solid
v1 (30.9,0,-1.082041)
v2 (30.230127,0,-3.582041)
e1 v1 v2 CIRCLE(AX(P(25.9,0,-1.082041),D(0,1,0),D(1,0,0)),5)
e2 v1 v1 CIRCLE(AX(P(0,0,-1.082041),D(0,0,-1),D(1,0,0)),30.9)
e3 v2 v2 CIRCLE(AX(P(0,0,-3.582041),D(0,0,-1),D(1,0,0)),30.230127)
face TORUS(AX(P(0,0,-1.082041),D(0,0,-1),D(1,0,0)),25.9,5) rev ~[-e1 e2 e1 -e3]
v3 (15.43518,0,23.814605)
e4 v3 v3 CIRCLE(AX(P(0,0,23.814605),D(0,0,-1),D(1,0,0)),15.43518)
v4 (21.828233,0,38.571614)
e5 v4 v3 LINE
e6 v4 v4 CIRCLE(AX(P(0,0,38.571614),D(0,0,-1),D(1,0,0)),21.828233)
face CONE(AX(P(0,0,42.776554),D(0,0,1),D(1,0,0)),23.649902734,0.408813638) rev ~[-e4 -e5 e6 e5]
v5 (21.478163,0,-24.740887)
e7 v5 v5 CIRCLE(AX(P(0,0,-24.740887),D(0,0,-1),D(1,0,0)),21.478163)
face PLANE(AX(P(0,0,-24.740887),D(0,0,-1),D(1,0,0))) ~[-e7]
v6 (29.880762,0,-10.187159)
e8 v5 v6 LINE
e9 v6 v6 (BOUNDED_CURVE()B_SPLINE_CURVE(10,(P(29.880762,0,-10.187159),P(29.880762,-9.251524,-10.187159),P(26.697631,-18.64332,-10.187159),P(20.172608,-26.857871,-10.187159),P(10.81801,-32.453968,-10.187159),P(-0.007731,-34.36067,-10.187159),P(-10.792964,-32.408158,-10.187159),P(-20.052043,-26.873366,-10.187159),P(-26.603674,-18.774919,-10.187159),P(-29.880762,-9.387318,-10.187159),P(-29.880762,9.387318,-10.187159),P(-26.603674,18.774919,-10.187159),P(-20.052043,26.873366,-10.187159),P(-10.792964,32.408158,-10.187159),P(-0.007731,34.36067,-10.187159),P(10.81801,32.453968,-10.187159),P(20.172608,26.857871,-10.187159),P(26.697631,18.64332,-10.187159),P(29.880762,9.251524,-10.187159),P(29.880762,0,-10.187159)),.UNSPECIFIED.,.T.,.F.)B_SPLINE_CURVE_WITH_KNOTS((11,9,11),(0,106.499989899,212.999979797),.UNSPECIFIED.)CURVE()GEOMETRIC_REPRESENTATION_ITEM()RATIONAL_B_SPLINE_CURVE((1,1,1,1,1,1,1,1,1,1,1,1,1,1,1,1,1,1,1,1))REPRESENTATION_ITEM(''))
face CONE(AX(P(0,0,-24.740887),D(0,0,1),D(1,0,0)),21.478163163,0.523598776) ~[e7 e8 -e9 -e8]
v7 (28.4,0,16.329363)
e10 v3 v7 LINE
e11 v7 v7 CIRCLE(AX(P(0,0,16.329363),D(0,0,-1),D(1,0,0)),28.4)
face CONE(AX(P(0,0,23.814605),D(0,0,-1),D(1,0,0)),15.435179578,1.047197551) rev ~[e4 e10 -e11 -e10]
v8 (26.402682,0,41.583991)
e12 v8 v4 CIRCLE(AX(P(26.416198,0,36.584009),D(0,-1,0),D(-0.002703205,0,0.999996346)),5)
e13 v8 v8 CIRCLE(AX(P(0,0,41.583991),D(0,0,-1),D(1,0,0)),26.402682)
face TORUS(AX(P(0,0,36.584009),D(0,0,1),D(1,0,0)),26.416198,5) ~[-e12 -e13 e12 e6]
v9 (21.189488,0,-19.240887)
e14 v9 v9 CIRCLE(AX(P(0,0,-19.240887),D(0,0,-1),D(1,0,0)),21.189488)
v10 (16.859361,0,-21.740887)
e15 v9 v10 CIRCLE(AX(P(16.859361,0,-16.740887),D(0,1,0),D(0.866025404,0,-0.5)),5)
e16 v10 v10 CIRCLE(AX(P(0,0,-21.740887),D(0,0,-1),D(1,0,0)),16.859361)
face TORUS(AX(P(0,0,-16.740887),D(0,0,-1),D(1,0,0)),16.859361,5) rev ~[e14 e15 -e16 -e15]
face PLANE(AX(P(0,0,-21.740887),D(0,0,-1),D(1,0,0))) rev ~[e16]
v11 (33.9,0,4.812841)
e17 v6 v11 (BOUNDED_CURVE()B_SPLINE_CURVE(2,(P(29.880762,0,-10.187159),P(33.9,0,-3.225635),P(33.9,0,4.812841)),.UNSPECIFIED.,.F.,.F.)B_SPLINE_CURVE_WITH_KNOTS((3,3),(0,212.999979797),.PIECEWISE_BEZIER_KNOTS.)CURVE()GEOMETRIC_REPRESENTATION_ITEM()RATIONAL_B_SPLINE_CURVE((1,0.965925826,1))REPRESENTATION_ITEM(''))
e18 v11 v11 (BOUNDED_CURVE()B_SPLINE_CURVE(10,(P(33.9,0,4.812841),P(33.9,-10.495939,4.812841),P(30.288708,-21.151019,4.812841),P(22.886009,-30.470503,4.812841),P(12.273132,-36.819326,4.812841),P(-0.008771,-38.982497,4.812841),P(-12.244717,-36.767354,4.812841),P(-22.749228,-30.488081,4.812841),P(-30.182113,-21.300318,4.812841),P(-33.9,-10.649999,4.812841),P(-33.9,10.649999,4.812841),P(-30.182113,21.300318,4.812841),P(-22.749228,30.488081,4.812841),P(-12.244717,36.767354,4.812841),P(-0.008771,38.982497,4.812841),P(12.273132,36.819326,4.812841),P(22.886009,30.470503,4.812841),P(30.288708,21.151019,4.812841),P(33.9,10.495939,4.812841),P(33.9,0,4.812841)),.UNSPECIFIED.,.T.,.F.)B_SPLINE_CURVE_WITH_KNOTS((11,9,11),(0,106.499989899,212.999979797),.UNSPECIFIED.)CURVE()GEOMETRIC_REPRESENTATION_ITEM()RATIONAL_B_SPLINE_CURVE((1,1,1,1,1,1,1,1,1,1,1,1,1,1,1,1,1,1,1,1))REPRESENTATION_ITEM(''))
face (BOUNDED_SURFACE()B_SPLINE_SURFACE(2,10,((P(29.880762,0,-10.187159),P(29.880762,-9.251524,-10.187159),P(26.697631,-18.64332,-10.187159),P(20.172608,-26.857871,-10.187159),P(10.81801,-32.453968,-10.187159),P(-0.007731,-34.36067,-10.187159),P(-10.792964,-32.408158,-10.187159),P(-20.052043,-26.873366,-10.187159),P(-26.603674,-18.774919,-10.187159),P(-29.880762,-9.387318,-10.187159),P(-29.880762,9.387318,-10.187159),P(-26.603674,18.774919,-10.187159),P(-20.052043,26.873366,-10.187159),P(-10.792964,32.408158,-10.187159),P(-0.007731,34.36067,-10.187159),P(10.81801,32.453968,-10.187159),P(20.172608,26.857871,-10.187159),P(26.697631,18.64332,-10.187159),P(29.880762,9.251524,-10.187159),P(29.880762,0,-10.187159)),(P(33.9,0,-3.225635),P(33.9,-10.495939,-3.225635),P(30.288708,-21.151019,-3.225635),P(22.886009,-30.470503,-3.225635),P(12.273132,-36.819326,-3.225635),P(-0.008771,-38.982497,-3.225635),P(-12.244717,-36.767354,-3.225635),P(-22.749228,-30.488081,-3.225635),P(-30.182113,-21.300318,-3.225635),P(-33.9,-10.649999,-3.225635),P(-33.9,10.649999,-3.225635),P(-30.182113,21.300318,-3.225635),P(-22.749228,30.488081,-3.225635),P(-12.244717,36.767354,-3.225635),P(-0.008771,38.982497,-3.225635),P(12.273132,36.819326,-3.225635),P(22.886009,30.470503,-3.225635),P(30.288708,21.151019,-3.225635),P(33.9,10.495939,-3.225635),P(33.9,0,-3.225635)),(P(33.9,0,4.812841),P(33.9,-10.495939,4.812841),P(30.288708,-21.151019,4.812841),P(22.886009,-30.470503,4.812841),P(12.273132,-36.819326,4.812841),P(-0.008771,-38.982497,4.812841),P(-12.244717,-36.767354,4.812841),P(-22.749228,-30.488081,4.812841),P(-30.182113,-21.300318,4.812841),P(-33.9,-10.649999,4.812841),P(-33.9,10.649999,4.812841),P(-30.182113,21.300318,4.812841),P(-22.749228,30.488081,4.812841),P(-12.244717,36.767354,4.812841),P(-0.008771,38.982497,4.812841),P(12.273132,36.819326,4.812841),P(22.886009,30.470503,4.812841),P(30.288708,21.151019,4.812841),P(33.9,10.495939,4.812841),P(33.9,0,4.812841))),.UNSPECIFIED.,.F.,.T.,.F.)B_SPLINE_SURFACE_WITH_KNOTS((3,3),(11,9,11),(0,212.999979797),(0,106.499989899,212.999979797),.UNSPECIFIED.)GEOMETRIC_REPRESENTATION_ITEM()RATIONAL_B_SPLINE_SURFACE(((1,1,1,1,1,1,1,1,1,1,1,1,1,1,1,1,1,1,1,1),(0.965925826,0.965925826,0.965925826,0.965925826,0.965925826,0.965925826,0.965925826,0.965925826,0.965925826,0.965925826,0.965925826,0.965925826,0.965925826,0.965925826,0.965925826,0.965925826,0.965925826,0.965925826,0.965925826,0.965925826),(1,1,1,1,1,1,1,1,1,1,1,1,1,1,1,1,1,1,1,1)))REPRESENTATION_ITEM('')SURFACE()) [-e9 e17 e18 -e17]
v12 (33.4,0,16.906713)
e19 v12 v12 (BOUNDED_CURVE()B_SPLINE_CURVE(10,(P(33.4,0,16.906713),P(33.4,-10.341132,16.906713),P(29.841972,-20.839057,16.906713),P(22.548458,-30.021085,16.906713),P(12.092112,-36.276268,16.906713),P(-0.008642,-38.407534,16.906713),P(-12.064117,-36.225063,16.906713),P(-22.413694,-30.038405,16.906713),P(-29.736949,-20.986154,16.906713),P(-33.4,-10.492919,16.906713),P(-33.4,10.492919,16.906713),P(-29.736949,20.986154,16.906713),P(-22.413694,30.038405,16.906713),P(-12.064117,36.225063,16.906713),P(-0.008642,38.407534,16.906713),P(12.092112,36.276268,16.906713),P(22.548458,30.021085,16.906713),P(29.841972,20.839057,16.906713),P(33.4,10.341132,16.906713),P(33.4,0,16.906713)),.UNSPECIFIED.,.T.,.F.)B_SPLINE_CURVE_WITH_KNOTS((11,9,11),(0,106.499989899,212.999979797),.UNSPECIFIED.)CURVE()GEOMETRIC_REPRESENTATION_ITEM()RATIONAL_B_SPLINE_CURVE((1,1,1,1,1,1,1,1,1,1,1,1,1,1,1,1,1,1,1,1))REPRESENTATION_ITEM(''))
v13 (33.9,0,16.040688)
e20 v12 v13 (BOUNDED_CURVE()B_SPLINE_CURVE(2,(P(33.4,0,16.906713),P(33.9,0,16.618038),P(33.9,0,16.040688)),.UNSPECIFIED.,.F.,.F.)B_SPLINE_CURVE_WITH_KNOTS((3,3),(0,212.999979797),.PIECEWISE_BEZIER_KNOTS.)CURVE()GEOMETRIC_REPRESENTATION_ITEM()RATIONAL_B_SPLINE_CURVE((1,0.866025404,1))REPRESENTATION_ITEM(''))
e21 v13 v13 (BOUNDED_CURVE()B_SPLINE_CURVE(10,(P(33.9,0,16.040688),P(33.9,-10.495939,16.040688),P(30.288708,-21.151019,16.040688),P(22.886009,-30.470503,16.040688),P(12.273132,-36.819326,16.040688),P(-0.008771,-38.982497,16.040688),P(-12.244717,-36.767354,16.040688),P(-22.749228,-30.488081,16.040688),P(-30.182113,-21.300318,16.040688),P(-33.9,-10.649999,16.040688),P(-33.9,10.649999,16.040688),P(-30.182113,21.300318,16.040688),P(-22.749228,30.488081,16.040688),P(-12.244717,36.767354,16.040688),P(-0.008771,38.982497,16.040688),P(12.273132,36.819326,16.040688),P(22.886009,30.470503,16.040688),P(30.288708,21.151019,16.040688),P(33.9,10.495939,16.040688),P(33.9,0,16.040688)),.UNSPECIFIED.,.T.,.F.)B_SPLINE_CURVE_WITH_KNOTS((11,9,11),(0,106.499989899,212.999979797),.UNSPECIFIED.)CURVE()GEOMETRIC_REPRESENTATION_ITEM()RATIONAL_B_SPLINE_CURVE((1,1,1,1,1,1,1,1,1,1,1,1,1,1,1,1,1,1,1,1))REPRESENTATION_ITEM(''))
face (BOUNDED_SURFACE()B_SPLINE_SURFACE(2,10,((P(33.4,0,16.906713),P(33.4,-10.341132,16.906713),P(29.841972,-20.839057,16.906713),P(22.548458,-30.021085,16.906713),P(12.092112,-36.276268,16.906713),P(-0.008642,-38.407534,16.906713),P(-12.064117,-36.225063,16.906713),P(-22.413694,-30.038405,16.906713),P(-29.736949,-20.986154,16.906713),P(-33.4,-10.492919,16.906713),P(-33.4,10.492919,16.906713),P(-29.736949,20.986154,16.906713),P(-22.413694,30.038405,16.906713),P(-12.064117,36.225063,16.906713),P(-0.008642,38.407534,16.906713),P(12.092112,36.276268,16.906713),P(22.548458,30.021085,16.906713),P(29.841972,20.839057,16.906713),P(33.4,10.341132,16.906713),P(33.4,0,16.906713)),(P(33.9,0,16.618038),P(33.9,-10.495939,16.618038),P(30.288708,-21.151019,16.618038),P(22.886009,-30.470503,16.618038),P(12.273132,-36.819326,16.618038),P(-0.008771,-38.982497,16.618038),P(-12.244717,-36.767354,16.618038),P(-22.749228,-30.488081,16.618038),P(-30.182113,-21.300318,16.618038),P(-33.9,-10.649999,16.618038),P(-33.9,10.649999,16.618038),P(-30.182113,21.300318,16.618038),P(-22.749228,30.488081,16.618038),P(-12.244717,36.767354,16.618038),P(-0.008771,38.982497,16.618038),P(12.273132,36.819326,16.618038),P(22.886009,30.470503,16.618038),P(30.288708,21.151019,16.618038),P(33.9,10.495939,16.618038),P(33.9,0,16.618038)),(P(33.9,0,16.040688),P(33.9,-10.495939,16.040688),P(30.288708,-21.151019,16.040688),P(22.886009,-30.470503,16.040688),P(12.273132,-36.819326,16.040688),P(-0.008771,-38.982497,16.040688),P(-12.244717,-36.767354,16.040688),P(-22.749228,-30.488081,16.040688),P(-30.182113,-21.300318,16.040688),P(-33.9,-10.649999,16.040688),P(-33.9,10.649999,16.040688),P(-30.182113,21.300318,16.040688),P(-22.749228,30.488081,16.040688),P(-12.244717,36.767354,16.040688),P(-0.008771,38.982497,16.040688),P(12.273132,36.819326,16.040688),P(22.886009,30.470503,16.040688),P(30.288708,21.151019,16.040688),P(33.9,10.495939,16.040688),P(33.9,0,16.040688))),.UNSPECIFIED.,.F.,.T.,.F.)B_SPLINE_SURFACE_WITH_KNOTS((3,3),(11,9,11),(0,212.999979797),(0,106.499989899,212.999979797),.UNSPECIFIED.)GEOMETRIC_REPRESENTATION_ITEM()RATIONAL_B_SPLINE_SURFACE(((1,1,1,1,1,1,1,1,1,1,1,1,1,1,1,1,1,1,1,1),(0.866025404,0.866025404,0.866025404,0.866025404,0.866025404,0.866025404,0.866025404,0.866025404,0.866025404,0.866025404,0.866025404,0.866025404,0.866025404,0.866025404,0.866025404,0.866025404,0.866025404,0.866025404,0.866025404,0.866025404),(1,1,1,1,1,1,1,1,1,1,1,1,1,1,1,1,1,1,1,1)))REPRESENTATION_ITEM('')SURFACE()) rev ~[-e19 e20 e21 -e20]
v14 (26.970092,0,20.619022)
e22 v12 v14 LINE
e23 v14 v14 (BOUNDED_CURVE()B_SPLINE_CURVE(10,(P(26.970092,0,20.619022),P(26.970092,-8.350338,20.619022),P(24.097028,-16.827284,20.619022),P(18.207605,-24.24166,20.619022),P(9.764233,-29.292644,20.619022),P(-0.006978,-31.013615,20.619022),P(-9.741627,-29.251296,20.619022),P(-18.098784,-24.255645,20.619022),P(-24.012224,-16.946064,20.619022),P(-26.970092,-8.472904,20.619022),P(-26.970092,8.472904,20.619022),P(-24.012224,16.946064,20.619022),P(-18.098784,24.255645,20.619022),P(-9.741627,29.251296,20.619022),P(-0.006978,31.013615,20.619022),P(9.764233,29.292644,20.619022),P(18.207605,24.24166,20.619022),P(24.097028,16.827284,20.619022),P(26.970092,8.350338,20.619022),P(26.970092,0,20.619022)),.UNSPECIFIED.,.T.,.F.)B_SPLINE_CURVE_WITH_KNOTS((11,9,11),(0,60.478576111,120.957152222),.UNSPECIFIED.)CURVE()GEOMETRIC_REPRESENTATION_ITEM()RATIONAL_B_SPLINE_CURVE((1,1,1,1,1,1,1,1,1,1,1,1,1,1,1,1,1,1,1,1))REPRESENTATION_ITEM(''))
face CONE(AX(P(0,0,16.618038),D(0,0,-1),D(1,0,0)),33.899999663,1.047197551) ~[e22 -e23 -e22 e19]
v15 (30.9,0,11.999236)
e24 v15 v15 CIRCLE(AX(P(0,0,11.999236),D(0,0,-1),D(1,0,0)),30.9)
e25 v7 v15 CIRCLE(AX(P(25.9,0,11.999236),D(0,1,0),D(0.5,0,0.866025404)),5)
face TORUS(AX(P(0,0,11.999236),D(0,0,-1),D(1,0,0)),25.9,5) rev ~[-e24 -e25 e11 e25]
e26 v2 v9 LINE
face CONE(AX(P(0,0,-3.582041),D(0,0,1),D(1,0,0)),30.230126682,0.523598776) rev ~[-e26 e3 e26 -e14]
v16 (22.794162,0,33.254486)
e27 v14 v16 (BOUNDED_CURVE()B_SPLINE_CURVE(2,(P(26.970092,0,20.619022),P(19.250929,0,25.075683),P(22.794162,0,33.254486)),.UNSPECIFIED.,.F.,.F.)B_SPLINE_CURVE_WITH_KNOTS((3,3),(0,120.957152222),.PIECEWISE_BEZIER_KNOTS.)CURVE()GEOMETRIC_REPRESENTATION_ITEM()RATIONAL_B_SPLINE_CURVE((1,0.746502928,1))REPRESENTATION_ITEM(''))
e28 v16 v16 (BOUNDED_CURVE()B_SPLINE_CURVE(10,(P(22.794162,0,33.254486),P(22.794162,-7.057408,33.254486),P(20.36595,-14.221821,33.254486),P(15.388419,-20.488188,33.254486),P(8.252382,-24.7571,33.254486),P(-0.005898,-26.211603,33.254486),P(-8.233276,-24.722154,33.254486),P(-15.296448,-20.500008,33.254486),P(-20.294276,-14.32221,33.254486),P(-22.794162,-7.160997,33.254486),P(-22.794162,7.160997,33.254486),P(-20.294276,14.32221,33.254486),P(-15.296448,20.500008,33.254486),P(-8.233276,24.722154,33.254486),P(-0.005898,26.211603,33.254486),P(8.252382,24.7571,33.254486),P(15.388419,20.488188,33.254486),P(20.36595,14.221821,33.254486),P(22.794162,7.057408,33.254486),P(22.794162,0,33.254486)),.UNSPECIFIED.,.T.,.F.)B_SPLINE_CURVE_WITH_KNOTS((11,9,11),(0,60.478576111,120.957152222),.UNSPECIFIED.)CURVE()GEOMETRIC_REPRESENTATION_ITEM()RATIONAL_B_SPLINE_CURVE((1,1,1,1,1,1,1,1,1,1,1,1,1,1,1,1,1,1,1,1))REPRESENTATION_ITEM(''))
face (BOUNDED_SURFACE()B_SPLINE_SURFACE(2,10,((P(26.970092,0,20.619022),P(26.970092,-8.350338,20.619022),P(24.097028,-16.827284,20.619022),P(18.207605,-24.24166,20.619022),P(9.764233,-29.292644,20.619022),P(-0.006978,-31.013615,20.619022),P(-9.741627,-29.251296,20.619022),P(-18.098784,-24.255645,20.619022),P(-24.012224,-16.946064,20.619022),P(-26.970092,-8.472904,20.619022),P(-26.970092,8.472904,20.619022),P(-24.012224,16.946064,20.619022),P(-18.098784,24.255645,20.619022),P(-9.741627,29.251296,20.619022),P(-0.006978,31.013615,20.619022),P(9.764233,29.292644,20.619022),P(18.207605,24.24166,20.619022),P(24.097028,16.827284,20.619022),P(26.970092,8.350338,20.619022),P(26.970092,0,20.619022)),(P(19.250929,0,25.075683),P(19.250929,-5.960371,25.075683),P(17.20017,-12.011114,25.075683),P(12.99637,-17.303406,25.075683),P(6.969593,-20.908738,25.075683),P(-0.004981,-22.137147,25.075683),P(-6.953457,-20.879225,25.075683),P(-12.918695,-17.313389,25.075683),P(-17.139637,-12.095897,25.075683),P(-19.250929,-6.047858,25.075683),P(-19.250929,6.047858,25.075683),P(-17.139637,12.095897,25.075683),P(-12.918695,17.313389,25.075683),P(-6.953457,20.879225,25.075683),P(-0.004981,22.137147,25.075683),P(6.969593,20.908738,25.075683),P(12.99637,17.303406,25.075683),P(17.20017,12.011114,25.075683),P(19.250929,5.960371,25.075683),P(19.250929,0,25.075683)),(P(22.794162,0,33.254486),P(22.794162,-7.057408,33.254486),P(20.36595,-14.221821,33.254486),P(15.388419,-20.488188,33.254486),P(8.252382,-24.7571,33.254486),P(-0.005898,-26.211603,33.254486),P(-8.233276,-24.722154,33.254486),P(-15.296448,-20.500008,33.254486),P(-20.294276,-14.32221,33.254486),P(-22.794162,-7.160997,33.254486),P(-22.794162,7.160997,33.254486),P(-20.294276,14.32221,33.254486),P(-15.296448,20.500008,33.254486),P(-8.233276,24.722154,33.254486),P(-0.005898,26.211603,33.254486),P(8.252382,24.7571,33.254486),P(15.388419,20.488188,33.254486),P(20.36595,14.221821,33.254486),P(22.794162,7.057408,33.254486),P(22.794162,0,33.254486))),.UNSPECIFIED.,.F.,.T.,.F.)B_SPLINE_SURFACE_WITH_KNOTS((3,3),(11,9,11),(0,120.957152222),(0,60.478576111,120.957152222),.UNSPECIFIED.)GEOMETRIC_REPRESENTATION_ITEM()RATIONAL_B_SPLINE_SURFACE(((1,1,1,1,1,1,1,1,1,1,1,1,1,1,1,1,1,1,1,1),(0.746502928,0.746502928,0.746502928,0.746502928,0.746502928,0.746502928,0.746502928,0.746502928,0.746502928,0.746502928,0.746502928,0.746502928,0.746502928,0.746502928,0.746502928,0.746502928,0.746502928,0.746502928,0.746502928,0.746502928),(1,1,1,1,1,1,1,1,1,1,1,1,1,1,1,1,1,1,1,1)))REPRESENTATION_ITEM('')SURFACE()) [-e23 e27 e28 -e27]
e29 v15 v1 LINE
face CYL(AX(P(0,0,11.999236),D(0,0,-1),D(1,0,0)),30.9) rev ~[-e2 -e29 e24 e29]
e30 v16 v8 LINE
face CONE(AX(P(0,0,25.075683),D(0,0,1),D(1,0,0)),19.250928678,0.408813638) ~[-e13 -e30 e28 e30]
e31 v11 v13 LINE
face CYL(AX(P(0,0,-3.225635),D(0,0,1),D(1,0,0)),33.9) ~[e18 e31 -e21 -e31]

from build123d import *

# Parameters (mm, degrees)
F2_R = 30
F3_R = 10
F4_R = 1


# Not quite as in the source:
# - a fillet or chamfer that OpenCascade refuses, or shapes differently, is made with other operations: its cross-section is extruded or revolved along the edge and cut away or added


with BuildPart() as f1:
    # F0 (on Front) → F1 (revolve)
    with BuildSketch(Plane.XZ):
        with BuildLine():
            Line((0, -21.7408868024), (0, -24.7408868024))
            Line((0, -24.7408868024), (21.4781631635, -24.7408868024))
            Line((21.4781631635, -24.7408868024), (33.8999996632, -3.2256348616))
            Line((33.8999996632, -3.2256348616), (33.8999996632, 16.6180381379))
            Line((33.8999996632, 16.6180381379), (19.2509286784, 25.0756832143))
            Line((19.2509286784, 25.0756832143), (26.4026819505, 41.5839911591))
            Line((26.4026819505, 41.5839911591), (23.6499027339, 42.7765541907))
            Line((23.6499027339, 42.7765541907), (15.4351795785, 23.8146053692))
            Line((15.4351795785, 23.8146053692), (28.3999996632, 16.3293630033))
            ThreePointArc((28.3999996632, 16.3293630033), (30.2301266822, 14.4992359844), (30.8999996632, 11.9992359844))
            Line((30.8999996632, 11.9992359844), (30.8999996632, -1.0820413221))
            ThreePointArc((30.8999996632, -1.0820413221), (30.7296287947, -2.3761365476), (30.2301266822, -3.5820413221))
            Line((30.2301266822, -3.5820413221), (21.1894880289, -19.2408868024))
            ThreePointArc((21.1894880289, -19.2408868024), (19.35936101, -21.0710138213), (16.85936101, -21.7408868024))
            Line((16.85936101, -21.7408868024), (0, -21.7408868024))
        make_face()
    revolve(axis=Axis((0, 0, 6.5311510116), (0, 0, -1)))

    # F2
    f2_edges = [f1.edges().sort_by_distance(p)[0] for p in [
        (-33.9, 0, -3.225635),
    ]]
    fillet(f2_edges, radius=F2_R)

    # F3
    f3_edges = [f1.edges().sort_by_distance(p)[0] for p in [
        (-19.250929, 0, 25.075683),
    ]]
    fillet(f3_edges, radius=F3_R)

    # F4
    f4_edges = [f1.edges().sort_by_distance(p)[0] for p in [
        (-33.9, 0, 16.618038),
    ]]
    fillet(f4_edges, radius=F4_R)

    # F5: fillet of radius 5 on 1 edges, made by hand

    # F5_s1 → F5_t2 (revolve, cut)
    with BuildSketch(Plane.XZ):
        with BuildLine():
            ThreePointArc((26.4026819505, 41.5839911591), (23.6662868758, 40.7598912449), (21.8282326127, 38.5716144801))
            Line((21.8282326127, 38.5716144801), (21.7364733055, 38.6113665812))
            Line((21.7364733055, 38.6113665812), (23.5581434266, 42.8163062918))
            Line((23.5581434266, 42.8163062918), (23.6896548349, 42.8683134979))
            ThreePointArc((23.6896548349, 42.8683134979), (25.0660444432, 42.2720319821), (26.40241163, 41.6839907937))
            Line((26.40241163, 41.6839907937), (26.4026819505, 41.5839911591))
        make_face()
    revolve(axis=Axis((0, 0, 42.7765541907), (0, 0, -1)), mode=Mode.SUBTRACT)


solid = f1.part
